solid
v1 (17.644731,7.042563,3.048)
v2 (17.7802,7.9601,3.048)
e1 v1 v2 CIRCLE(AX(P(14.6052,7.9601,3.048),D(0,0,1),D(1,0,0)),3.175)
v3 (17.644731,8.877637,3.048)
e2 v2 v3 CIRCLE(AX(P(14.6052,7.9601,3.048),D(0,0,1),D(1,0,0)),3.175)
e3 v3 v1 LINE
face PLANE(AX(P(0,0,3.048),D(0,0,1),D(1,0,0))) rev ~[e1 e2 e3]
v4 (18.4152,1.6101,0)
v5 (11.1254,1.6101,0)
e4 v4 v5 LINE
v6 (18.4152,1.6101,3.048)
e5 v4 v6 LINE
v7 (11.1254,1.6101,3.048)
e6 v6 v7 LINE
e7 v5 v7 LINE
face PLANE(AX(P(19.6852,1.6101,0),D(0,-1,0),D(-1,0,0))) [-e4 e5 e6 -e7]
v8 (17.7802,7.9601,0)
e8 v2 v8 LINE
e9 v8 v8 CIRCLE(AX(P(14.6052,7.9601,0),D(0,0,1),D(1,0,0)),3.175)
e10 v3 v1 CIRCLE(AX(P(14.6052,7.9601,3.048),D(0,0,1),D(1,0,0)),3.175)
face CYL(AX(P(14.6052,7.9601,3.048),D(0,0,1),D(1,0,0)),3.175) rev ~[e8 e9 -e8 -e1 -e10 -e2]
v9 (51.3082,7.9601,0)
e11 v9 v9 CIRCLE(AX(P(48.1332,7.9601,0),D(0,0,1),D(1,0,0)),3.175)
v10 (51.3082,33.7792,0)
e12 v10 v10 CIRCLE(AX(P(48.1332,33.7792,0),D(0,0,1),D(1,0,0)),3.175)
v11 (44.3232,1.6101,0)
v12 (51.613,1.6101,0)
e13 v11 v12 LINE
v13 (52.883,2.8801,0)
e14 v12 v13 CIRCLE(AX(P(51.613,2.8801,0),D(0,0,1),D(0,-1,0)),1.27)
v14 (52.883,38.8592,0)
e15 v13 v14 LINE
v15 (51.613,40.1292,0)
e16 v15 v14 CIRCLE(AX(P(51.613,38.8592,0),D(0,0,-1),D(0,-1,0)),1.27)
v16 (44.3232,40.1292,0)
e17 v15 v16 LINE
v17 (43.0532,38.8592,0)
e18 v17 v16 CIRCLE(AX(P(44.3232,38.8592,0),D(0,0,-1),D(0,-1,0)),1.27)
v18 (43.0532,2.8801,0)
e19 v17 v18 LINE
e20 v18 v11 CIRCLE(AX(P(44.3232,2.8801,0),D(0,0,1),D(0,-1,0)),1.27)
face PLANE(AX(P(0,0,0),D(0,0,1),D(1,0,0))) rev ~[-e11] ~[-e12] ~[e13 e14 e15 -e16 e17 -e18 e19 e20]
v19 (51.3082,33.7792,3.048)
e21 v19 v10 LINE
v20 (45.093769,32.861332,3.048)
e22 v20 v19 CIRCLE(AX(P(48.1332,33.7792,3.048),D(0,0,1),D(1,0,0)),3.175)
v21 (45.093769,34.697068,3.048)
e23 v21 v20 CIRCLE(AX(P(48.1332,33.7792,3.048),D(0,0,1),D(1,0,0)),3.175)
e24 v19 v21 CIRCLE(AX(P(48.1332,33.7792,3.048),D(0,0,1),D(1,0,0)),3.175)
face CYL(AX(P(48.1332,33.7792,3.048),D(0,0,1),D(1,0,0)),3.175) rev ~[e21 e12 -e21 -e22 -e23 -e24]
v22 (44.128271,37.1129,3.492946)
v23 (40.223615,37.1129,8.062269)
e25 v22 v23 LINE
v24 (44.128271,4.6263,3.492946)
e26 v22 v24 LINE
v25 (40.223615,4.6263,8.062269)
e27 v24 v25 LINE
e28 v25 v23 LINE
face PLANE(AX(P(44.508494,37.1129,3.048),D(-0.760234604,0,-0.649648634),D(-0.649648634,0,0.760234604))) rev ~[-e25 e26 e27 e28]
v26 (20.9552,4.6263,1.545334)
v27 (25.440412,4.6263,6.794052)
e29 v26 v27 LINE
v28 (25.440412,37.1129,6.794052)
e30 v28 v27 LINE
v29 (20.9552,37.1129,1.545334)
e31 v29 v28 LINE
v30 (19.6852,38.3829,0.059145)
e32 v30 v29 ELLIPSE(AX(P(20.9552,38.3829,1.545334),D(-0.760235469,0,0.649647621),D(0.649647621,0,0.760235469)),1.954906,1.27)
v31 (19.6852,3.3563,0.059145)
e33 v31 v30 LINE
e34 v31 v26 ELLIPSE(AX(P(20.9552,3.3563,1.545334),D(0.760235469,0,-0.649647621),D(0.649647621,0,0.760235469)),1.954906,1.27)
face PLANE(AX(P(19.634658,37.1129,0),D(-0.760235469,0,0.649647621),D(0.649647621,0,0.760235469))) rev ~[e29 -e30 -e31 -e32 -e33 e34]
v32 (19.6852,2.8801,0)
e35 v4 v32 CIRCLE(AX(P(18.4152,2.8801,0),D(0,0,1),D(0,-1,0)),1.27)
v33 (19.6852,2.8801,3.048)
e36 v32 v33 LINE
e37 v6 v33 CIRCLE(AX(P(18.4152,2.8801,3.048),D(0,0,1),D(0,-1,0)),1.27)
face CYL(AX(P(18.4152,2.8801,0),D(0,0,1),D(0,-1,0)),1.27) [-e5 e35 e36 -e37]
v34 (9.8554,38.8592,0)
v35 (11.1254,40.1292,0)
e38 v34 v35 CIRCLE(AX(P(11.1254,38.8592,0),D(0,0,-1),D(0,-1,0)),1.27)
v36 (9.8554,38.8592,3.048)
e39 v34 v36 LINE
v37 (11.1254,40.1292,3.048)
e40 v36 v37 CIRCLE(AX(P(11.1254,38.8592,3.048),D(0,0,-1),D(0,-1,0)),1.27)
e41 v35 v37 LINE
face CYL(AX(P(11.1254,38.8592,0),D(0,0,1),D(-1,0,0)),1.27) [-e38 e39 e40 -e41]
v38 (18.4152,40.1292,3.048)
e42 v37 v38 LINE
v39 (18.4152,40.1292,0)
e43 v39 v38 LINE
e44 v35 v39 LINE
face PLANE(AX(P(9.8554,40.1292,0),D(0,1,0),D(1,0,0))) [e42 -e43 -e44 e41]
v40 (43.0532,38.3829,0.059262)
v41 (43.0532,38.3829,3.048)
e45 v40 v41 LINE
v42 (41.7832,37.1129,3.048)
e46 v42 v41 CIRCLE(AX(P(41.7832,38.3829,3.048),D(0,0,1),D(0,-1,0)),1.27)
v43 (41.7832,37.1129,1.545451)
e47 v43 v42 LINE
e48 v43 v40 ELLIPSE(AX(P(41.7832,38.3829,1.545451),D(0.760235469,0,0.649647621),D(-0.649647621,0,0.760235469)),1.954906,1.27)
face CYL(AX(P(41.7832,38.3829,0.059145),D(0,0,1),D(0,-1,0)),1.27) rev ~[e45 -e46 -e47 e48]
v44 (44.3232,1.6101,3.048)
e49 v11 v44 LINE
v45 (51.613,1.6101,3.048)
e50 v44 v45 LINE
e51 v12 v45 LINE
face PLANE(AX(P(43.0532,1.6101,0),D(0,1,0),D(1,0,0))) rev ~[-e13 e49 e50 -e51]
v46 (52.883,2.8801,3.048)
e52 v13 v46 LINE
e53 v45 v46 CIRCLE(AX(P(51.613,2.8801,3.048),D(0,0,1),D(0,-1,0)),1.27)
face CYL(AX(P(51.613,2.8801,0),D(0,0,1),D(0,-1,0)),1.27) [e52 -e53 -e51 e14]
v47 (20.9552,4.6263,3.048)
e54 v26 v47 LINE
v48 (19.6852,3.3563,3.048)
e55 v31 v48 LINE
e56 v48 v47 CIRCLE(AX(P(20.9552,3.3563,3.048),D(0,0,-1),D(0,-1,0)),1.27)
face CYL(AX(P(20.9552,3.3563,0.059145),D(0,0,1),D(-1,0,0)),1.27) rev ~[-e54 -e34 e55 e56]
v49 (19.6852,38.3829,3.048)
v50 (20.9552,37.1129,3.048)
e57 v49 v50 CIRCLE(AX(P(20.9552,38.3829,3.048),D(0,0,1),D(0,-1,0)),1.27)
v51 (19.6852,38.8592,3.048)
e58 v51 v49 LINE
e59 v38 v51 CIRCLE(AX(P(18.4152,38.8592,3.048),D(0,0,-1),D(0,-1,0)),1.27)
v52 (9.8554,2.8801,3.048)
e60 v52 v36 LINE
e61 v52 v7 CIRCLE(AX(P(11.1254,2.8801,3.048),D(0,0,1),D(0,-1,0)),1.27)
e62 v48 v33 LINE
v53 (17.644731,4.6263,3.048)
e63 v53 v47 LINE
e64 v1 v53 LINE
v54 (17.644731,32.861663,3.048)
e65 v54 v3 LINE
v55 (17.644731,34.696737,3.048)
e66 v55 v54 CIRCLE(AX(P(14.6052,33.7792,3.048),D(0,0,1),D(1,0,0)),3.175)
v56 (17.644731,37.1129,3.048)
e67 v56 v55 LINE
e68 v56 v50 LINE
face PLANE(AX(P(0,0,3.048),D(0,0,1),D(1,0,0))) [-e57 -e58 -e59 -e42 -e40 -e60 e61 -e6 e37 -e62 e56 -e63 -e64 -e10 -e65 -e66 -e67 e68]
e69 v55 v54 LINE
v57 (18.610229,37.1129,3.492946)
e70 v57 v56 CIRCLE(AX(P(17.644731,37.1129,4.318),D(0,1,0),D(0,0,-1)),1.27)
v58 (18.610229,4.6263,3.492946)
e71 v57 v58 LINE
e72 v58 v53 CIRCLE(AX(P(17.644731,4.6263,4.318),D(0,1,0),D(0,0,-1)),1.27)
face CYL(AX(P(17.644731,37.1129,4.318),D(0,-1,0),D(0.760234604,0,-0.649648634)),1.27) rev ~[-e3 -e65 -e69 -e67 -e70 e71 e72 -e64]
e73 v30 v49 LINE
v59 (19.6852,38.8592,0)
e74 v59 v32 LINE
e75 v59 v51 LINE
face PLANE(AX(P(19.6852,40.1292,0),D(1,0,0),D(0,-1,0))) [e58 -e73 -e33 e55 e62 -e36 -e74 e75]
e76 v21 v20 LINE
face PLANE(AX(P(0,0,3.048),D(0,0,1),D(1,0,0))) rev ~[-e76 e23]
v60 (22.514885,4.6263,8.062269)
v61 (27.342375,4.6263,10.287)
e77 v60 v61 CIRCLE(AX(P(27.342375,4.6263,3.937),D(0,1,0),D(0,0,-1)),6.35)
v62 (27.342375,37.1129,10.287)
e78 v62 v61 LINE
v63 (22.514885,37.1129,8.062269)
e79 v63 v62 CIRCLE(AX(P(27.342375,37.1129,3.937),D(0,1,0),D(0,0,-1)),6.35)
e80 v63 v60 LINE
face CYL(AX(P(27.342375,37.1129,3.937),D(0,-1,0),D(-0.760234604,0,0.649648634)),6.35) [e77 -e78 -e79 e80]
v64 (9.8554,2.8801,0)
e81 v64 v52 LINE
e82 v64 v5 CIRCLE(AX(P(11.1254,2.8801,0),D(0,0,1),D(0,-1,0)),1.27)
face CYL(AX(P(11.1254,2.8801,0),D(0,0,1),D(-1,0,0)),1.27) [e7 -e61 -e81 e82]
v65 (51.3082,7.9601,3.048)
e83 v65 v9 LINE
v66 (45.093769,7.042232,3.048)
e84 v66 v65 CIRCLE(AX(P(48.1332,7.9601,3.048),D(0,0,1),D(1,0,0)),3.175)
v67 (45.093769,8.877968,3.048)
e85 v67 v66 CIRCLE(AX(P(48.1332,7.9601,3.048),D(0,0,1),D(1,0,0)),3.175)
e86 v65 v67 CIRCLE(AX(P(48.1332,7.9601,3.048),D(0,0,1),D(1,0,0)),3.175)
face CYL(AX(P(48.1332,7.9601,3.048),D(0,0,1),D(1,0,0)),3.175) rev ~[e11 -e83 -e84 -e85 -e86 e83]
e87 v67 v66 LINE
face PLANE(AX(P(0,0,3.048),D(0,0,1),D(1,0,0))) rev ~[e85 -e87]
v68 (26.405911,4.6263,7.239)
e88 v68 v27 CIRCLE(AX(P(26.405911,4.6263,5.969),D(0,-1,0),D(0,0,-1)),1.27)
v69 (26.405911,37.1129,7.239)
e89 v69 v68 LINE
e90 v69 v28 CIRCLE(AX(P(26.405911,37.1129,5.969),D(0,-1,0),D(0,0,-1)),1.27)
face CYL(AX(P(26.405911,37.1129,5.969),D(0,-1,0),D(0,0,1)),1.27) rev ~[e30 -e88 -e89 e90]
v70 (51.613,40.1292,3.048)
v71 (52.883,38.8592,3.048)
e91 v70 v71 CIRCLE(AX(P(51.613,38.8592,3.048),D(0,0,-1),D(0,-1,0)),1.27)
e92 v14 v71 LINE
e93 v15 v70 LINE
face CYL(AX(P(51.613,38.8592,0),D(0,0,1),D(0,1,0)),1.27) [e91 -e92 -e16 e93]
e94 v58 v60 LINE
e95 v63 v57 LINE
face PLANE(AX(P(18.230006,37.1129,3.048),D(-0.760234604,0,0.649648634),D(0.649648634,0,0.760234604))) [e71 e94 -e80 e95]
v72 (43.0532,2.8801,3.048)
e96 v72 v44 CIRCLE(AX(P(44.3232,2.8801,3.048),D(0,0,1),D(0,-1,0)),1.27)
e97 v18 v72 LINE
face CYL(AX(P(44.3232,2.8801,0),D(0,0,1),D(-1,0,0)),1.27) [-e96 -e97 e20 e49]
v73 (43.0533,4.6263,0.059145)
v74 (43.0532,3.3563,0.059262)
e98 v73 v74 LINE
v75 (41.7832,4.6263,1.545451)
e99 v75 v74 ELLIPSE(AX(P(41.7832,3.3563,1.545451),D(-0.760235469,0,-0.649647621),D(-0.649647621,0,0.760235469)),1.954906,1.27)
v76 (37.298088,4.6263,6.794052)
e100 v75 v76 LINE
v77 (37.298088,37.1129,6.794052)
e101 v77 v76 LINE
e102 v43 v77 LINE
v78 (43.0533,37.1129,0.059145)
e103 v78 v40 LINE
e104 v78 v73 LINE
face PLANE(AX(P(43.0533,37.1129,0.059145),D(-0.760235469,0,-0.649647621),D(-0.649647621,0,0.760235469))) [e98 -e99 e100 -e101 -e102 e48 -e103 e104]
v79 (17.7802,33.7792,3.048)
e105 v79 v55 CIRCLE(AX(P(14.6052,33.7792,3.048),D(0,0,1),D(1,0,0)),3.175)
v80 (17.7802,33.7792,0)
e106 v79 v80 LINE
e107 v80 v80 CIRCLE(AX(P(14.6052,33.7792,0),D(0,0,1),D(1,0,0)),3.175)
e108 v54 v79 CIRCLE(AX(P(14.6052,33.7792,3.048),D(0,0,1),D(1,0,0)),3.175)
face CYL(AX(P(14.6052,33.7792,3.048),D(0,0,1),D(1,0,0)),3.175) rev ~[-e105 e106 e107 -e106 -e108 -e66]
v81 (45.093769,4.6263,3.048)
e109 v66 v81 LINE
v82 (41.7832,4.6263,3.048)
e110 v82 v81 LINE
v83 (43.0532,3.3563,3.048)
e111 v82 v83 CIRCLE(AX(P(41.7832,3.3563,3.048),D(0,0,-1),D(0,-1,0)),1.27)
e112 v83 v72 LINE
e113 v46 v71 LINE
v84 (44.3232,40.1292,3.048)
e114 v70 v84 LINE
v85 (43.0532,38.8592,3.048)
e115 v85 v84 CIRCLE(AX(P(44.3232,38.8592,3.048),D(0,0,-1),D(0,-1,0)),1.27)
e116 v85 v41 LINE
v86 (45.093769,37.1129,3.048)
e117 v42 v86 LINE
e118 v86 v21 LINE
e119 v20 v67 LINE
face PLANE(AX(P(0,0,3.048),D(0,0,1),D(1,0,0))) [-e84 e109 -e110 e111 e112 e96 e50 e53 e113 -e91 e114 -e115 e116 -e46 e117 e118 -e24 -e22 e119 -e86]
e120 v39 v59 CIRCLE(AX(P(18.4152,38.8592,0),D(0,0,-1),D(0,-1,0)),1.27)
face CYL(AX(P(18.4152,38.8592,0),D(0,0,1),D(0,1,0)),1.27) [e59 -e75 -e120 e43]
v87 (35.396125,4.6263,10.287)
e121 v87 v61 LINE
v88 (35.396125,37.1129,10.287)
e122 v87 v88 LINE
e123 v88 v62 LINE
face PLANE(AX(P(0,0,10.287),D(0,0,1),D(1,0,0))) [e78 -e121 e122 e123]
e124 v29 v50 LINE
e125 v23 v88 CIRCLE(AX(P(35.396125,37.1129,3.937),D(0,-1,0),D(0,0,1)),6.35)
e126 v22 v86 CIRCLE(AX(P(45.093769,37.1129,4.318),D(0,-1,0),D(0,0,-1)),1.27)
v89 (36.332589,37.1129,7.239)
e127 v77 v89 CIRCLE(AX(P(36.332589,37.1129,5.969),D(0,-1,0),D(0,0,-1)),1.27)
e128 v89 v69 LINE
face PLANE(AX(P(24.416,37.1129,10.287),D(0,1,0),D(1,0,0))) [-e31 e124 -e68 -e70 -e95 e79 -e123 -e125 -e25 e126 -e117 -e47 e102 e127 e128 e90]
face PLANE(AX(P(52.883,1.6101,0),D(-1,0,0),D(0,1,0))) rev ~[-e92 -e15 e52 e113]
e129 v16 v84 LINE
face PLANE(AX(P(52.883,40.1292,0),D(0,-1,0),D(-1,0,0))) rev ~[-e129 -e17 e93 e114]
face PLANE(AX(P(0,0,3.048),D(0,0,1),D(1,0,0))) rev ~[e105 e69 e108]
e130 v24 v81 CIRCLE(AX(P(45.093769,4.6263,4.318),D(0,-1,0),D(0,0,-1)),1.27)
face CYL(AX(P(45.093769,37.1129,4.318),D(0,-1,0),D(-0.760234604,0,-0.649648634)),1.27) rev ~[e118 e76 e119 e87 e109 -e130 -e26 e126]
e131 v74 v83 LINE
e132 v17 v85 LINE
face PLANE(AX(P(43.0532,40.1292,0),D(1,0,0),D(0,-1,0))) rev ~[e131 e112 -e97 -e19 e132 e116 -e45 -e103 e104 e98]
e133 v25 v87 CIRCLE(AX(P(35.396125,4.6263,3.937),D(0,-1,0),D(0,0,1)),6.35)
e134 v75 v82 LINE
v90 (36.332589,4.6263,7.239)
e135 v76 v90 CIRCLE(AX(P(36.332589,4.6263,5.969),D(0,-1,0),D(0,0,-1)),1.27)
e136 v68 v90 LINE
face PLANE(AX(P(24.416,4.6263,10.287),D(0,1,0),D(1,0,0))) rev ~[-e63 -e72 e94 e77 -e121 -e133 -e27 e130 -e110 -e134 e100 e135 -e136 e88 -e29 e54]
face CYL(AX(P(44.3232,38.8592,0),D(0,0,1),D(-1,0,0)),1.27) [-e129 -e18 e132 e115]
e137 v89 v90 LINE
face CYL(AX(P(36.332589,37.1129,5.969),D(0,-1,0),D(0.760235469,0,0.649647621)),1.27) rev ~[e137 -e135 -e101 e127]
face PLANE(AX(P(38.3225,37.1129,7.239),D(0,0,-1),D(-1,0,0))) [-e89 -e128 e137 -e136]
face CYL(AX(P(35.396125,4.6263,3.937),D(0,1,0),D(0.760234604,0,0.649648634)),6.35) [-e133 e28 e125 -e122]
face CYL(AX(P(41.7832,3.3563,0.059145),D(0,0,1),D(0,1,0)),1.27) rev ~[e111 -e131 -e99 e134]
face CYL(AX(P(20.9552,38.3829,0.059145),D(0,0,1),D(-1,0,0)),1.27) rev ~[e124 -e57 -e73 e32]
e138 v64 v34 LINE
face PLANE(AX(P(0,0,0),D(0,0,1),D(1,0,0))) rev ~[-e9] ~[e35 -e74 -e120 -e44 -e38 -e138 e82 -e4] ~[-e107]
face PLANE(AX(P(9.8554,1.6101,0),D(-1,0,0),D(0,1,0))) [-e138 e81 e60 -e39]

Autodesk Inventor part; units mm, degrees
ref_plane "YZ Plane" through (0, 0, 0) normal (1, 0, 0) x (0, 1, 0)
ref_plane "XZ Plane" through (0, 0, 0) normal (0, 1, 0) x (-1, 0, 0)
ref_plane "XY Plane" through (0, 0, 0) normal (0, 0, 1) x (1, 0, 0)
sketch "Sketch1" plane through (0, 0, 0) normal (0, 0, 1) x (1, 0, 0)
  line L0 (38.3225, 4.6263) -> (24.416, 4.6263)
  line L1 (38.3225, 4.6263) -> (38.3225, 37.1129)
  line L2 (38.3225, 37.1129) -> (24.416, 37.1129)
  line L3 (24.416, 37.1129) -> (24.416, 4.6263)
  line L4 (9.8554, 1.6101) -> (9.8554, 40.1292)
  line L5 (9.8554, 40.1292) -> (19.6852, 40.1292)
  line L6 (19.6852, 40.1292) -> (19.6852, 1.6101)
  line L7 (19.6852, 1.6101) -> (9.8554, 1.6101)
  line L8 (31.3692, 4.6263) -> (31.3692, 37.1129)
  line L9 (52.883, 1.6101) -> (52.883, 40.1292)
  line L10 (52.883, 40.1292) -> (43.0532, 40.1292)
  line L11 (43.0532, 40.1292) -> (43.0532, 1.6101)
  line L12 (43.0532, 1.6101) -> (52.883, 1.6101)
  point P0 (0, 0)
  point P1 (9.8554, 20.8696)
  point P2 (52.883, 20.8696)
  dimension "d0" = 13.9065
  dimension "d1" = 32.4866
  dimension "d2" = 38.5191
  dimension "d3" = 16.2433
  dimension "d5" = 9.8298
  dimension "d31" = 43.0276
  dimension "d59" = 38.5191
extrude "Extrusion6" add sketch "Sketch1" along normal blind 3.048 contours L4 L5 L6 L7 | L12 L11 L10 L9
extrude "Extrusion7" add sketch "Sketch1" along normal blind 10.287 contours L0 L8 L2 L1 | L0 L3 L2 L8
sketch "Sketch6" plane through (24.416, 37.1129, 0) normal (0, 1, 0) x (1, 0, 0)
  line L0 (13.9065, 0) -> (0, 0) projected
  line L1 (0, 0) -> (0, -10.287) projected
  line L2 (13.9065, -10.287) -> (0, -10.287) projected
  line L3 (13.9065, 0) -> (13.9065, -10.287) projected
  line L4 (13.9065, -7.239) -> (0, -7.239)
  point P0 (-24.416, 0)
  dimension "d36" = 3.048
extrude "Extrusion8" cut sketch "Sketch6" against normal blind 50.8 contours L3 L4 L1 L0
sketch "Sketch7" plane through (24.416, 37.1129, 10.287) normal (0, 1, 0) x (1, 0, 0)
  line L0 (28.4671, 7.239) -> (18.6373, 7.239) projected
  line L1 (0, 0) -> (13.9065, 0) projected
  line L2 (20.4193, 12.3132) -> (10.4121, 0.6025)
  line L3 (23.3323, 11.0303) -> (13.9065, 0)
  line L4 (13.9065, 3.048) -> (13.9065, 0) projected
  line L5 (13.9065, 0) -> (10.4121, 0)
  line L6 (10.4121, 0.6025) -> (10.4121, 0)
  line L7 (28.4671, 10.287) -> (18.6373, 10.287) projected
  line L8 (18.6373, 10.287) -> (18.6373, 7.239) projected
  line L9 (28.4671, 7.239) -> (18.6373, 7.239) projected
  line L10 (28.4671, 10.287) -> (28.4671, 7.239) projected
  line L11 (13.9065, 3.048) -> (0, 3.048) projected
  line L12 (0, 3.048) -> (0, 0) projected
  line L13 (13.9065, 0) -> (0, 0) projected
  line L14 (13.9065, 3.048) -> (13.9065, 0) projected
  line L15 (6.9533, 0) -> (6.9533, 10.1633)
  line L16 (-14.5606, 7.239) -> (-4.7307, 7.239)
  line L17 (-6.5128, 12.3132) -> (3.4944, 0.6025)
  line L18 (-9.4258, 11.0303) -> (0, 0)
  line L19 (0, 0) -> (3.4944, 0)
  line L20 (3.4944, 0.6025) -> (3.4944, 0)
  line L21 (-14.5606, 10.287) -> (-4.7307, 10.287)
  point P0 (-24.416, 10.287)
  point P1 (1.4047, 3.048)
  point P2 (-4.7813, 10.287)
  point P3 (-8.7906, 10.287)
  point P4 (12.5018, 3.048)
  point P5 (20.0925, 7.239)
  point P6 (18.6373, 10.2278)
  dimension "d39" = 3.048
  dimension "d40" = 0
  dimension "d41" = 0
extrude "Extrusion9" add sketch "Sketch7" against normal blind 32.4866 contours L3 L4 L11 L2 L8 L0 | L11 L12 L18 L21 L17
sketch "Sketch8" plane through (0, 0, 3.048) normal (0, 0, 1) x (1, 0, 0)
  circle A0 centre (14.6052, 7.9601) radius 3.175
  line L0 (9.8554, 1.6101) -> (19.6852, 1.6101) projected
  circle A1 centre (14.6052, 33.7792) radius 3.175
  line L1 (19.6852, 40.1292) -> (9.8554, 40.1292) projected
  line L2 (38.3225, 37.1129) -> (24.416, 37.1129) projected
  line L3 (24.416, 37.1129) -> (24.416, 4.6263) projected
  line L4 (24.416, 4.6263) -> (38.3225, 4.6263) projected
  line L5 (38.3225, 4.6263) -> (38.3225, 37.1129) projected
  line L6 (38.3225, 37.1129) -> (24.416, 37.1129) projected
  line L7 (31.3692, 37.1129) -> (31.3692, 17.7925)
  line L8 (19.6852, 1.6101) -> (19.6852, 40.1292) projected
  line L9 (19.6852, 1.6101) -> (19.6852, 4.6263) projected
  circle A2 centre (48.1332, 7.9601) radius 3.175
  circle A3 centre (48.1332, 33.7792) radius 3.175
  point P0 (0, 0)
  point P1 (19.6852, 37.1129)
  point P2 (19.6852, 38.6211)
  dimension "d44" = 6.35
  dimension "d45" = 6.35
  dimension "d46" = 6.35
  dimension "d47" = 6.35
  dimension "d55" = 5.08
  dimension "d56" = 5.08
fillet "Fillet4" radius 1.27 12 edges at (9.8554, 40.1292, 1.524) (19.6852, 40.1292, 1.524) (19.6852, 37.1129, 1.5536) (43.0532, 37.1129, 1.5536) (43.0532, 40.1292, 1.524) (52.883, 40.1292, 1.524) (52.883, 1.6101, 1.524) (43.0532, 1.6101, 1.524) (9.8554, 1.6101, 1.524) (19.6852, 1.6101, 1.524) (19.6852, 4.6263, 1.5536) (43.0532, 4.6263, 1.5536)
fillet "Fillet5" radius 6.35 2 edges at (24.416, 20.8696, 10.287) (38.3225, 20.8696, 10.287)
fillet "Fillet6" radius 1.27 1 edges at (18.23, 20.8696, 3.048)
fillet "Fillet7" radius 1.27 1 edges at (44.5085, 20.8696, 3.048)
fillet "Fillet8" radius 1.27 2 edges at (25.8207, 20.8696, 7.239) (36.9178, 20.8696, 7.239)
extrude "Extrusion11" cut sketch "Sketch8" against normal blind 50.8 contours A0 | A1 | A2 | A3
properties part number "Wheel Bracket"
